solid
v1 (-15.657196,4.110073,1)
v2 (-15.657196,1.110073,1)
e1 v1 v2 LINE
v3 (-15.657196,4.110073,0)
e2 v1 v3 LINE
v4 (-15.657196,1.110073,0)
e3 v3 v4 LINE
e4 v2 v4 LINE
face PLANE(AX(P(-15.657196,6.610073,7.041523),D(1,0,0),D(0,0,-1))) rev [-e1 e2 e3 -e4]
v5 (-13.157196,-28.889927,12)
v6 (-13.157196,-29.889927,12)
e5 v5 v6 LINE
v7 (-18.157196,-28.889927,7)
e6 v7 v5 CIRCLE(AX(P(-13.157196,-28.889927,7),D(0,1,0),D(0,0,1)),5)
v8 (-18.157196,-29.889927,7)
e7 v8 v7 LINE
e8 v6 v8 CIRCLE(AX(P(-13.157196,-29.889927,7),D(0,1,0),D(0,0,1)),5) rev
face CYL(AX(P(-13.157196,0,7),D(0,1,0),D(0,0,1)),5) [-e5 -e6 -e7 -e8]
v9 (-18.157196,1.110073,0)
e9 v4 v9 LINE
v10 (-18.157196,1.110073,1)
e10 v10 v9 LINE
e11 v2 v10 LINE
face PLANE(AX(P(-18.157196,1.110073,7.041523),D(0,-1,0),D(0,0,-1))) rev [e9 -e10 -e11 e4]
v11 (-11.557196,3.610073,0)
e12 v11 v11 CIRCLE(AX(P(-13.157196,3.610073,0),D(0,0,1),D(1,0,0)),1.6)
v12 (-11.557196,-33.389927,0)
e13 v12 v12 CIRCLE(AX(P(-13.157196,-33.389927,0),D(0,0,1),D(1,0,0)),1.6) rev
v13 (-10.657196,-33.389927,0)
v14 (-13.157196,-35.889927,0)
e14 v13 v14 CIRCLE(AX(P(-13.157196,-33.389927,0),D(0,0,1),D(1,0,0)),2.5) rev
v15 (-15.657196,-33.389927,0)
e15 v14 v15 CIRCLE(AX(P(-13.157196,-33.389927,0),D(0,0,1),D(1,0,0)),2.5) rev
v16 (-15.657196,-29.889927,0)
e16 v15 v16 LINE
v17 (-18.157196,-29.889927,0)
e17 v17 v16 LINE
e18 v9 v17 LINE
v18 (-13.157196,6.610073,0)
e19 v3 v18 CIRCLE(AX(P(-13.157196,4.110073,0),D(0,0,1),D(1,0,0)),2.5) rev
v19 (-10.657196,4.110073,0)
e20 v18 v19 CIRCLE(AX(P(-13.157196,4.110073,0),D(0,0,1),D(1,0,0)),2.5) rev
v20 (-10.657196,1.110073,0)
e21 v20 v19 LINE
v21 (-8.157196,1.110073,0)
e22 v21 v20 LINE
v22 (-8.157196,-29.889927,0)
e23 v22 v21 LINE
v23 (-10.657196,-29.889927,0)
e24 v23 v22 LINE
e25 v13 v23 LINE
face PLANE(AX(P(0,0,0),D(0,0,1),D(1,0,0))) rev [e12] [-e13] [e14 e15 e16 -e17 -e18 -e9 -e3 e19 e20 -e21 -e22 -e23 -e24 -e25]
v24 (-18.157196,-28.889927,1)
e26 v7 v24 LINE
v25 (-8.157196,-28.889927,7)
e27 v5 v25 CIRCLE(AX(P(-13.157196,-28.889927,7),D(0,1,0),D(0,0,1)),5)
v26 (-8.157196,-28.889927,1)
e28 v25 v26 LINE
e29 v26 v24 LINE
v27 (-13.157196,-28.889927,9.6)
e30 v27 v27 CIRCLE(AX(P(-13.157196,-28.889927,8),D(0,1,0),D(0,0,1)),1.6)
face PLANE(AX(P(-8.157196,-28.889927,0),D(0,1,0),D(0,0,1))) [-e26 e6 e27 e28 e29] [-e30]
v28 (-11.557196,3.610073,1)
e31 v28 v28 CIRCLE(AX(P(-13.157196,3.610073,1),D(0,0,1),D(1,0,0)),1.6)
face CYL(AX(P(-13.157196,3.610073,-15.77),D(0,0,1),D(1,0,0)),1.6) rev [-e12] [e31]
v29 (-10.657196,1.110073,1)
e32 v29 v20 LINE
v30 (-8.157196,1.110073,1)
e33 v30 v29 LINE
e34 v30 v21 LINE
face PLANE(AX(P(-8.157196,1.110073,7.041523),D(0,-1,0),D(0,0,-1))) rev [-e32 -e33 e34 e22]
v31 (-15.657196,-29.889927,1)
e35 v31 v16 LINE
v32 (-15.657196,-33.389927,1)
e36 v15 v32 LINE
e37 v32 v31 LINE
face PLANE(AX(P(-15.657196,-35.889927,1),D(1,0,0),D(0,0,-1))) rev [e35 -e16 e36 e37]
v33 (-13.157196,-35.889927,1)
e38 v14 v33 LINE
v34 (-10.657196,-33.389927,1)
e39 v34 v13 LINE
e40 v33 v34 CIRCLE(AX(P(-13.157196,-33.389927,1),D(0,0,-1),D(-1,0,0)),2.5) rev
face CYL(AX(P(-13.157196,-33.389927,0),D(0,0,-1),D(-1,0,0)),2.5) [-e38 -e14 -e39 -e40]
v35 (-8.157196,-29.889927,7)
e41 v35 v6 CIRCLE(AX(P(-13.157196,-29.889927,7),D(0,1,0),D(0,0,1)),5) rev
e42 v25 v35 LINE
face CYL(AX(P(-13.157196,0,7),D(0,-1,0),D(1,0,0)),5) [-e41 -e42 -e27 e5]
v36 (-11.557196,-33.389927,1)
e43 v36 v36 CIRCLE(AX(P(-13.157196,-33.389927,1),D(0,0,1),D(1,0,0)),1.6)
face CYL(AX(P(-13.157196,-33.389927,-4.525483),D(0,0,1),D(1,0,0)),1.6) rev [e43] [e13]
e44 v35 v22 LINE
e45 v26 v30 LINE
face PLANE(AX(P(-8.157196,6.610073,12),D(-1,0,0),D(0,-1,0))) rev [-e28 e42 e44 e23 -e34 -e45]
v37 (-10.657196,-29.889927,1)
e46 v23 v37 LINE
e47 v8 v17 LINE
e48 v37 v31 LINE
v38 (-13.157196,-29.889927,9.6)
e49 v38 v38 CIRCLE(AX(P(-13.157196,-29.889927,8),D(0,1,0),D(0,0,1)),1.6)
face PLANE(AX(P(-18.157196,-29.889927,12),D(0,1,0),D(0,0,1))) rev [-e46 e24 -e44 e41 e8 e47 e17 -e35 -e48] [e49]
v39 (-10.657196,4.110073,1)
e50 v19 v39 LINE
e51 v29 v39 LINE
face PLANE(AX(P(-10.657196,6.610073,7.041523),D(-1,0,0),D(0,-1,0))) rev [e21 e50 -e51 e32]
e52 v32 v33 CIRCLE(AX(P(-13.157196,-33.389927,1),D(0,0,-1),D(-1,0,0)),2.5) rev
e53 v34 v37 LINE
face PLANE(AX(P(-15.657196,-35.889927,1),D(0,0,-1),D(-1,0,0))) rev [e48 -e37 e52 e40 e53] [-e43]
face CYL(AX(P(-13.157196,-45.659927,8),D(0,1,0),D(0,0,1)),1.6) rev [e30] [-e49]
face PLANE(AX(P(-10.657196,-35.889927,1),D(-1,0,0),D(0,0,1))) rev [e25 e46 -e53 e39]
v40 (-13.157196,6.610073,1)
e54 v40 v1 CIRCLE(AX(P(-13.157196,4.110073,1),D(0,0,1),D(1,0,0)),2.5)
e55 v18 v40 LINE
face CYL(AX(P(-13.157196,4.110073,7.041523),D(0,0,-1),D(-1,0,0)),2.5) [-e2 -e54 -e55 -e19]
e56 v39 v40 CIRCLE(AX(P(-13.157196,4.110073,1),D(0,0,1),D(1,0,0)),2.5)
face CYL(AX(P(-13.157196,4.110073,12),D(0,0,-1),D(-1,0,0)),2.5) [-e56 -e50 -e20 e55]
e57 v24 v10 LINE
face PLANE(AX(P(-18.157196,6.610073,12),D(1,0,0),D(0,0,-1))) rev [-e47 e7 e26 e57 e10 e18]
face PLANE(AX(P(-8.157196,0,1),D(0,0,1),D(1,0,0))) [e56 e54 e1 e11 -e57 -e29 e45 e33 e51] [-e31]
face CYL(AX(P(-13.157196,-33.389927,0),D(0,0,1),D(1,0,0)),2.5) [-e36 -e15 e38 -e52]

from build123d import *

# Parameters (mm, degrees)
SKETCH1_W           = 10
SKETCH1_H           = 36.5
BOSS_EXTRUDE1_DEPTH = 12
SKETCH2_W           = 11
SKETCH2_H           = 35.5
CUT_EXTRUDE1_DEPTH  = 34.725476075
SKETCH3_R           = 1.6
CUT_EXTRUDE2_DEPTH  = 16.77
SKETCH4_R           = 1.6
CUT_EXTRUDE4_DEPTH  = 16.77
FILLET1_R           = 5
FILLET2_R           = 5
SKETCH8_W           = 5
SKETCH8_H           = 1
BOSS_EXTRUDE2_DEPTH = 6
FILLET6_R           = 2.5
SKETCH9_R           = 1.6
CUT_EXTRUDE6_DEPTH  = 1
SKETCH10_W          = 2.5
SKETCH10_H          = 5.5
CUT_EXTRUDE7_DEPTH  = 1
FILLET7_R           = 2.5


with BuildPart() as part:
    # Sketch1 → Boss-Extrude1 (new body)
    with BuildSketch(Plane.XY):
        with Locations((-13.157195709, -11.639927007)):
            Rectangle(SKETCH1_W, SKETCH1_H)
    extrude(amount=BOSS_EXTRUDE1_DEPTH)

    # Sketch2 → Cut-Extrude1 (cut, through all)
    with BuildSketch(Plane.ZY.offset(18.157195709)):
        with Locations((6.5, -11.139927007)):
            Rectangle(SKETCH2_W, SKETCH2_H)
    extrude(amount=-CUT_EXTRUDE1_DEPTH, mode=Mode.SUBTRACT)

    # Sketch3 → Cut-Extrude2 (cut)
    with BuildSketch(Plane.XY.offset(1)):
        with Locations((-13.157195709, 3.610072993)):
            Circle(SKETCH3_R)
    extrude(amount=-CUT_EXTRUDE2_DEPTH, mode=Mode.SUBTRACT)

    # Sketch4 → Cut-Extrude4 (cut)
    with BuildSketch(Plane(origin=(0, -28.889927007, 0), x_dir=(1, 0, 0), z_dir=(0, 1, 0))):
        with Locations(Location((-13.157195709, -8, 0), (0, 0, 270))):
            Circle(SKETCH4_R)
    extrude(amount=-CUT_EXTRUDE4_DEPTH, mode=Mode.SUBTRACT)

    # Fillet1
    fillet1_edges = [part.edges().sort_by_distance(p)[0] for p in [
        (-18.157195709, -29.389927007, 12),
    ]]
    fillet(fillet1_edges, radius=FILLET1_R)

    # Fillet2
    fillet2_edges = [part.edges().sort_by_distance(p)[0] for p in [
        (-8.157195709, -29.389927007, 12),
    ]]
    fillet(fillet2_edges, radius=FILLET2_R - 0.0001)  # a hair under: the kernel refuses the full size

    # Sketch8 → Boss-Extrude2 (add)
    with BuildSketch(Plane.XZ.offset(29.889927007)):
        with Locations((-13.157195709, 0.5)):
            Rectangle(SKETCH8_W, SKETCH8_H)
    extrude(amount=BOSS_EXTRUDE2_DEPTH)

    # Fillet6
    fillet6_edges = [part.edges().sort_by_distance(p)[0] for p in [
        (-15.657195709, -35.889927007, 0.5),
        (-10.657195709, -35.889927007, 0.5),
    ]]
    fillet(fillet6_edges, radius=FILLET6_R - 0.0001)  # a hair under: the kernel refuses the full size

    # Sketch9 → Cut-Extrude6 (cut)
    with BuildSketch(Plane.XY.offset(1)):
        with Locations((-13.157195709, -33.389927007)):
            Circle(SKETCH9_R)
    extrude(amount=-CUT_EXTRUDE6_DEPTH, mode=Mode.SUBTRACT)

    # Sketch10 → Cut-Extrude7 (cut)
    with BuildSketch(Plane(origin=(0, 0, 0), x_dir=(-1, 0, 0), z_dir=(0, 0, -1))):
        with Locations((9.407195709, 3.860072993)):
            Rectangle(SKETCH10_W, SKETCH10_H)
        with Locations((16.907195709, 3.860072993)):
            Rectangle(SKETCH10_W, SKETCH10_H)
    extrude(amount=-CUT_EXTRUDE7_DEPTH, mode=Mode.SUBTRACT)

    # Fillet7
    fillet7_edges = [part.edges().sort_by_distance(p)[0] for p in [
        (-10.657195709, 6.610072993, 0.5),
        (-15.657195709, 6.610072993, 0.5),
    ]]
    fillet(fillet7_edges, radius=FILLET7_R - 0.0001)  # a hair under: the kernel refuses the full size


solid = part.part
